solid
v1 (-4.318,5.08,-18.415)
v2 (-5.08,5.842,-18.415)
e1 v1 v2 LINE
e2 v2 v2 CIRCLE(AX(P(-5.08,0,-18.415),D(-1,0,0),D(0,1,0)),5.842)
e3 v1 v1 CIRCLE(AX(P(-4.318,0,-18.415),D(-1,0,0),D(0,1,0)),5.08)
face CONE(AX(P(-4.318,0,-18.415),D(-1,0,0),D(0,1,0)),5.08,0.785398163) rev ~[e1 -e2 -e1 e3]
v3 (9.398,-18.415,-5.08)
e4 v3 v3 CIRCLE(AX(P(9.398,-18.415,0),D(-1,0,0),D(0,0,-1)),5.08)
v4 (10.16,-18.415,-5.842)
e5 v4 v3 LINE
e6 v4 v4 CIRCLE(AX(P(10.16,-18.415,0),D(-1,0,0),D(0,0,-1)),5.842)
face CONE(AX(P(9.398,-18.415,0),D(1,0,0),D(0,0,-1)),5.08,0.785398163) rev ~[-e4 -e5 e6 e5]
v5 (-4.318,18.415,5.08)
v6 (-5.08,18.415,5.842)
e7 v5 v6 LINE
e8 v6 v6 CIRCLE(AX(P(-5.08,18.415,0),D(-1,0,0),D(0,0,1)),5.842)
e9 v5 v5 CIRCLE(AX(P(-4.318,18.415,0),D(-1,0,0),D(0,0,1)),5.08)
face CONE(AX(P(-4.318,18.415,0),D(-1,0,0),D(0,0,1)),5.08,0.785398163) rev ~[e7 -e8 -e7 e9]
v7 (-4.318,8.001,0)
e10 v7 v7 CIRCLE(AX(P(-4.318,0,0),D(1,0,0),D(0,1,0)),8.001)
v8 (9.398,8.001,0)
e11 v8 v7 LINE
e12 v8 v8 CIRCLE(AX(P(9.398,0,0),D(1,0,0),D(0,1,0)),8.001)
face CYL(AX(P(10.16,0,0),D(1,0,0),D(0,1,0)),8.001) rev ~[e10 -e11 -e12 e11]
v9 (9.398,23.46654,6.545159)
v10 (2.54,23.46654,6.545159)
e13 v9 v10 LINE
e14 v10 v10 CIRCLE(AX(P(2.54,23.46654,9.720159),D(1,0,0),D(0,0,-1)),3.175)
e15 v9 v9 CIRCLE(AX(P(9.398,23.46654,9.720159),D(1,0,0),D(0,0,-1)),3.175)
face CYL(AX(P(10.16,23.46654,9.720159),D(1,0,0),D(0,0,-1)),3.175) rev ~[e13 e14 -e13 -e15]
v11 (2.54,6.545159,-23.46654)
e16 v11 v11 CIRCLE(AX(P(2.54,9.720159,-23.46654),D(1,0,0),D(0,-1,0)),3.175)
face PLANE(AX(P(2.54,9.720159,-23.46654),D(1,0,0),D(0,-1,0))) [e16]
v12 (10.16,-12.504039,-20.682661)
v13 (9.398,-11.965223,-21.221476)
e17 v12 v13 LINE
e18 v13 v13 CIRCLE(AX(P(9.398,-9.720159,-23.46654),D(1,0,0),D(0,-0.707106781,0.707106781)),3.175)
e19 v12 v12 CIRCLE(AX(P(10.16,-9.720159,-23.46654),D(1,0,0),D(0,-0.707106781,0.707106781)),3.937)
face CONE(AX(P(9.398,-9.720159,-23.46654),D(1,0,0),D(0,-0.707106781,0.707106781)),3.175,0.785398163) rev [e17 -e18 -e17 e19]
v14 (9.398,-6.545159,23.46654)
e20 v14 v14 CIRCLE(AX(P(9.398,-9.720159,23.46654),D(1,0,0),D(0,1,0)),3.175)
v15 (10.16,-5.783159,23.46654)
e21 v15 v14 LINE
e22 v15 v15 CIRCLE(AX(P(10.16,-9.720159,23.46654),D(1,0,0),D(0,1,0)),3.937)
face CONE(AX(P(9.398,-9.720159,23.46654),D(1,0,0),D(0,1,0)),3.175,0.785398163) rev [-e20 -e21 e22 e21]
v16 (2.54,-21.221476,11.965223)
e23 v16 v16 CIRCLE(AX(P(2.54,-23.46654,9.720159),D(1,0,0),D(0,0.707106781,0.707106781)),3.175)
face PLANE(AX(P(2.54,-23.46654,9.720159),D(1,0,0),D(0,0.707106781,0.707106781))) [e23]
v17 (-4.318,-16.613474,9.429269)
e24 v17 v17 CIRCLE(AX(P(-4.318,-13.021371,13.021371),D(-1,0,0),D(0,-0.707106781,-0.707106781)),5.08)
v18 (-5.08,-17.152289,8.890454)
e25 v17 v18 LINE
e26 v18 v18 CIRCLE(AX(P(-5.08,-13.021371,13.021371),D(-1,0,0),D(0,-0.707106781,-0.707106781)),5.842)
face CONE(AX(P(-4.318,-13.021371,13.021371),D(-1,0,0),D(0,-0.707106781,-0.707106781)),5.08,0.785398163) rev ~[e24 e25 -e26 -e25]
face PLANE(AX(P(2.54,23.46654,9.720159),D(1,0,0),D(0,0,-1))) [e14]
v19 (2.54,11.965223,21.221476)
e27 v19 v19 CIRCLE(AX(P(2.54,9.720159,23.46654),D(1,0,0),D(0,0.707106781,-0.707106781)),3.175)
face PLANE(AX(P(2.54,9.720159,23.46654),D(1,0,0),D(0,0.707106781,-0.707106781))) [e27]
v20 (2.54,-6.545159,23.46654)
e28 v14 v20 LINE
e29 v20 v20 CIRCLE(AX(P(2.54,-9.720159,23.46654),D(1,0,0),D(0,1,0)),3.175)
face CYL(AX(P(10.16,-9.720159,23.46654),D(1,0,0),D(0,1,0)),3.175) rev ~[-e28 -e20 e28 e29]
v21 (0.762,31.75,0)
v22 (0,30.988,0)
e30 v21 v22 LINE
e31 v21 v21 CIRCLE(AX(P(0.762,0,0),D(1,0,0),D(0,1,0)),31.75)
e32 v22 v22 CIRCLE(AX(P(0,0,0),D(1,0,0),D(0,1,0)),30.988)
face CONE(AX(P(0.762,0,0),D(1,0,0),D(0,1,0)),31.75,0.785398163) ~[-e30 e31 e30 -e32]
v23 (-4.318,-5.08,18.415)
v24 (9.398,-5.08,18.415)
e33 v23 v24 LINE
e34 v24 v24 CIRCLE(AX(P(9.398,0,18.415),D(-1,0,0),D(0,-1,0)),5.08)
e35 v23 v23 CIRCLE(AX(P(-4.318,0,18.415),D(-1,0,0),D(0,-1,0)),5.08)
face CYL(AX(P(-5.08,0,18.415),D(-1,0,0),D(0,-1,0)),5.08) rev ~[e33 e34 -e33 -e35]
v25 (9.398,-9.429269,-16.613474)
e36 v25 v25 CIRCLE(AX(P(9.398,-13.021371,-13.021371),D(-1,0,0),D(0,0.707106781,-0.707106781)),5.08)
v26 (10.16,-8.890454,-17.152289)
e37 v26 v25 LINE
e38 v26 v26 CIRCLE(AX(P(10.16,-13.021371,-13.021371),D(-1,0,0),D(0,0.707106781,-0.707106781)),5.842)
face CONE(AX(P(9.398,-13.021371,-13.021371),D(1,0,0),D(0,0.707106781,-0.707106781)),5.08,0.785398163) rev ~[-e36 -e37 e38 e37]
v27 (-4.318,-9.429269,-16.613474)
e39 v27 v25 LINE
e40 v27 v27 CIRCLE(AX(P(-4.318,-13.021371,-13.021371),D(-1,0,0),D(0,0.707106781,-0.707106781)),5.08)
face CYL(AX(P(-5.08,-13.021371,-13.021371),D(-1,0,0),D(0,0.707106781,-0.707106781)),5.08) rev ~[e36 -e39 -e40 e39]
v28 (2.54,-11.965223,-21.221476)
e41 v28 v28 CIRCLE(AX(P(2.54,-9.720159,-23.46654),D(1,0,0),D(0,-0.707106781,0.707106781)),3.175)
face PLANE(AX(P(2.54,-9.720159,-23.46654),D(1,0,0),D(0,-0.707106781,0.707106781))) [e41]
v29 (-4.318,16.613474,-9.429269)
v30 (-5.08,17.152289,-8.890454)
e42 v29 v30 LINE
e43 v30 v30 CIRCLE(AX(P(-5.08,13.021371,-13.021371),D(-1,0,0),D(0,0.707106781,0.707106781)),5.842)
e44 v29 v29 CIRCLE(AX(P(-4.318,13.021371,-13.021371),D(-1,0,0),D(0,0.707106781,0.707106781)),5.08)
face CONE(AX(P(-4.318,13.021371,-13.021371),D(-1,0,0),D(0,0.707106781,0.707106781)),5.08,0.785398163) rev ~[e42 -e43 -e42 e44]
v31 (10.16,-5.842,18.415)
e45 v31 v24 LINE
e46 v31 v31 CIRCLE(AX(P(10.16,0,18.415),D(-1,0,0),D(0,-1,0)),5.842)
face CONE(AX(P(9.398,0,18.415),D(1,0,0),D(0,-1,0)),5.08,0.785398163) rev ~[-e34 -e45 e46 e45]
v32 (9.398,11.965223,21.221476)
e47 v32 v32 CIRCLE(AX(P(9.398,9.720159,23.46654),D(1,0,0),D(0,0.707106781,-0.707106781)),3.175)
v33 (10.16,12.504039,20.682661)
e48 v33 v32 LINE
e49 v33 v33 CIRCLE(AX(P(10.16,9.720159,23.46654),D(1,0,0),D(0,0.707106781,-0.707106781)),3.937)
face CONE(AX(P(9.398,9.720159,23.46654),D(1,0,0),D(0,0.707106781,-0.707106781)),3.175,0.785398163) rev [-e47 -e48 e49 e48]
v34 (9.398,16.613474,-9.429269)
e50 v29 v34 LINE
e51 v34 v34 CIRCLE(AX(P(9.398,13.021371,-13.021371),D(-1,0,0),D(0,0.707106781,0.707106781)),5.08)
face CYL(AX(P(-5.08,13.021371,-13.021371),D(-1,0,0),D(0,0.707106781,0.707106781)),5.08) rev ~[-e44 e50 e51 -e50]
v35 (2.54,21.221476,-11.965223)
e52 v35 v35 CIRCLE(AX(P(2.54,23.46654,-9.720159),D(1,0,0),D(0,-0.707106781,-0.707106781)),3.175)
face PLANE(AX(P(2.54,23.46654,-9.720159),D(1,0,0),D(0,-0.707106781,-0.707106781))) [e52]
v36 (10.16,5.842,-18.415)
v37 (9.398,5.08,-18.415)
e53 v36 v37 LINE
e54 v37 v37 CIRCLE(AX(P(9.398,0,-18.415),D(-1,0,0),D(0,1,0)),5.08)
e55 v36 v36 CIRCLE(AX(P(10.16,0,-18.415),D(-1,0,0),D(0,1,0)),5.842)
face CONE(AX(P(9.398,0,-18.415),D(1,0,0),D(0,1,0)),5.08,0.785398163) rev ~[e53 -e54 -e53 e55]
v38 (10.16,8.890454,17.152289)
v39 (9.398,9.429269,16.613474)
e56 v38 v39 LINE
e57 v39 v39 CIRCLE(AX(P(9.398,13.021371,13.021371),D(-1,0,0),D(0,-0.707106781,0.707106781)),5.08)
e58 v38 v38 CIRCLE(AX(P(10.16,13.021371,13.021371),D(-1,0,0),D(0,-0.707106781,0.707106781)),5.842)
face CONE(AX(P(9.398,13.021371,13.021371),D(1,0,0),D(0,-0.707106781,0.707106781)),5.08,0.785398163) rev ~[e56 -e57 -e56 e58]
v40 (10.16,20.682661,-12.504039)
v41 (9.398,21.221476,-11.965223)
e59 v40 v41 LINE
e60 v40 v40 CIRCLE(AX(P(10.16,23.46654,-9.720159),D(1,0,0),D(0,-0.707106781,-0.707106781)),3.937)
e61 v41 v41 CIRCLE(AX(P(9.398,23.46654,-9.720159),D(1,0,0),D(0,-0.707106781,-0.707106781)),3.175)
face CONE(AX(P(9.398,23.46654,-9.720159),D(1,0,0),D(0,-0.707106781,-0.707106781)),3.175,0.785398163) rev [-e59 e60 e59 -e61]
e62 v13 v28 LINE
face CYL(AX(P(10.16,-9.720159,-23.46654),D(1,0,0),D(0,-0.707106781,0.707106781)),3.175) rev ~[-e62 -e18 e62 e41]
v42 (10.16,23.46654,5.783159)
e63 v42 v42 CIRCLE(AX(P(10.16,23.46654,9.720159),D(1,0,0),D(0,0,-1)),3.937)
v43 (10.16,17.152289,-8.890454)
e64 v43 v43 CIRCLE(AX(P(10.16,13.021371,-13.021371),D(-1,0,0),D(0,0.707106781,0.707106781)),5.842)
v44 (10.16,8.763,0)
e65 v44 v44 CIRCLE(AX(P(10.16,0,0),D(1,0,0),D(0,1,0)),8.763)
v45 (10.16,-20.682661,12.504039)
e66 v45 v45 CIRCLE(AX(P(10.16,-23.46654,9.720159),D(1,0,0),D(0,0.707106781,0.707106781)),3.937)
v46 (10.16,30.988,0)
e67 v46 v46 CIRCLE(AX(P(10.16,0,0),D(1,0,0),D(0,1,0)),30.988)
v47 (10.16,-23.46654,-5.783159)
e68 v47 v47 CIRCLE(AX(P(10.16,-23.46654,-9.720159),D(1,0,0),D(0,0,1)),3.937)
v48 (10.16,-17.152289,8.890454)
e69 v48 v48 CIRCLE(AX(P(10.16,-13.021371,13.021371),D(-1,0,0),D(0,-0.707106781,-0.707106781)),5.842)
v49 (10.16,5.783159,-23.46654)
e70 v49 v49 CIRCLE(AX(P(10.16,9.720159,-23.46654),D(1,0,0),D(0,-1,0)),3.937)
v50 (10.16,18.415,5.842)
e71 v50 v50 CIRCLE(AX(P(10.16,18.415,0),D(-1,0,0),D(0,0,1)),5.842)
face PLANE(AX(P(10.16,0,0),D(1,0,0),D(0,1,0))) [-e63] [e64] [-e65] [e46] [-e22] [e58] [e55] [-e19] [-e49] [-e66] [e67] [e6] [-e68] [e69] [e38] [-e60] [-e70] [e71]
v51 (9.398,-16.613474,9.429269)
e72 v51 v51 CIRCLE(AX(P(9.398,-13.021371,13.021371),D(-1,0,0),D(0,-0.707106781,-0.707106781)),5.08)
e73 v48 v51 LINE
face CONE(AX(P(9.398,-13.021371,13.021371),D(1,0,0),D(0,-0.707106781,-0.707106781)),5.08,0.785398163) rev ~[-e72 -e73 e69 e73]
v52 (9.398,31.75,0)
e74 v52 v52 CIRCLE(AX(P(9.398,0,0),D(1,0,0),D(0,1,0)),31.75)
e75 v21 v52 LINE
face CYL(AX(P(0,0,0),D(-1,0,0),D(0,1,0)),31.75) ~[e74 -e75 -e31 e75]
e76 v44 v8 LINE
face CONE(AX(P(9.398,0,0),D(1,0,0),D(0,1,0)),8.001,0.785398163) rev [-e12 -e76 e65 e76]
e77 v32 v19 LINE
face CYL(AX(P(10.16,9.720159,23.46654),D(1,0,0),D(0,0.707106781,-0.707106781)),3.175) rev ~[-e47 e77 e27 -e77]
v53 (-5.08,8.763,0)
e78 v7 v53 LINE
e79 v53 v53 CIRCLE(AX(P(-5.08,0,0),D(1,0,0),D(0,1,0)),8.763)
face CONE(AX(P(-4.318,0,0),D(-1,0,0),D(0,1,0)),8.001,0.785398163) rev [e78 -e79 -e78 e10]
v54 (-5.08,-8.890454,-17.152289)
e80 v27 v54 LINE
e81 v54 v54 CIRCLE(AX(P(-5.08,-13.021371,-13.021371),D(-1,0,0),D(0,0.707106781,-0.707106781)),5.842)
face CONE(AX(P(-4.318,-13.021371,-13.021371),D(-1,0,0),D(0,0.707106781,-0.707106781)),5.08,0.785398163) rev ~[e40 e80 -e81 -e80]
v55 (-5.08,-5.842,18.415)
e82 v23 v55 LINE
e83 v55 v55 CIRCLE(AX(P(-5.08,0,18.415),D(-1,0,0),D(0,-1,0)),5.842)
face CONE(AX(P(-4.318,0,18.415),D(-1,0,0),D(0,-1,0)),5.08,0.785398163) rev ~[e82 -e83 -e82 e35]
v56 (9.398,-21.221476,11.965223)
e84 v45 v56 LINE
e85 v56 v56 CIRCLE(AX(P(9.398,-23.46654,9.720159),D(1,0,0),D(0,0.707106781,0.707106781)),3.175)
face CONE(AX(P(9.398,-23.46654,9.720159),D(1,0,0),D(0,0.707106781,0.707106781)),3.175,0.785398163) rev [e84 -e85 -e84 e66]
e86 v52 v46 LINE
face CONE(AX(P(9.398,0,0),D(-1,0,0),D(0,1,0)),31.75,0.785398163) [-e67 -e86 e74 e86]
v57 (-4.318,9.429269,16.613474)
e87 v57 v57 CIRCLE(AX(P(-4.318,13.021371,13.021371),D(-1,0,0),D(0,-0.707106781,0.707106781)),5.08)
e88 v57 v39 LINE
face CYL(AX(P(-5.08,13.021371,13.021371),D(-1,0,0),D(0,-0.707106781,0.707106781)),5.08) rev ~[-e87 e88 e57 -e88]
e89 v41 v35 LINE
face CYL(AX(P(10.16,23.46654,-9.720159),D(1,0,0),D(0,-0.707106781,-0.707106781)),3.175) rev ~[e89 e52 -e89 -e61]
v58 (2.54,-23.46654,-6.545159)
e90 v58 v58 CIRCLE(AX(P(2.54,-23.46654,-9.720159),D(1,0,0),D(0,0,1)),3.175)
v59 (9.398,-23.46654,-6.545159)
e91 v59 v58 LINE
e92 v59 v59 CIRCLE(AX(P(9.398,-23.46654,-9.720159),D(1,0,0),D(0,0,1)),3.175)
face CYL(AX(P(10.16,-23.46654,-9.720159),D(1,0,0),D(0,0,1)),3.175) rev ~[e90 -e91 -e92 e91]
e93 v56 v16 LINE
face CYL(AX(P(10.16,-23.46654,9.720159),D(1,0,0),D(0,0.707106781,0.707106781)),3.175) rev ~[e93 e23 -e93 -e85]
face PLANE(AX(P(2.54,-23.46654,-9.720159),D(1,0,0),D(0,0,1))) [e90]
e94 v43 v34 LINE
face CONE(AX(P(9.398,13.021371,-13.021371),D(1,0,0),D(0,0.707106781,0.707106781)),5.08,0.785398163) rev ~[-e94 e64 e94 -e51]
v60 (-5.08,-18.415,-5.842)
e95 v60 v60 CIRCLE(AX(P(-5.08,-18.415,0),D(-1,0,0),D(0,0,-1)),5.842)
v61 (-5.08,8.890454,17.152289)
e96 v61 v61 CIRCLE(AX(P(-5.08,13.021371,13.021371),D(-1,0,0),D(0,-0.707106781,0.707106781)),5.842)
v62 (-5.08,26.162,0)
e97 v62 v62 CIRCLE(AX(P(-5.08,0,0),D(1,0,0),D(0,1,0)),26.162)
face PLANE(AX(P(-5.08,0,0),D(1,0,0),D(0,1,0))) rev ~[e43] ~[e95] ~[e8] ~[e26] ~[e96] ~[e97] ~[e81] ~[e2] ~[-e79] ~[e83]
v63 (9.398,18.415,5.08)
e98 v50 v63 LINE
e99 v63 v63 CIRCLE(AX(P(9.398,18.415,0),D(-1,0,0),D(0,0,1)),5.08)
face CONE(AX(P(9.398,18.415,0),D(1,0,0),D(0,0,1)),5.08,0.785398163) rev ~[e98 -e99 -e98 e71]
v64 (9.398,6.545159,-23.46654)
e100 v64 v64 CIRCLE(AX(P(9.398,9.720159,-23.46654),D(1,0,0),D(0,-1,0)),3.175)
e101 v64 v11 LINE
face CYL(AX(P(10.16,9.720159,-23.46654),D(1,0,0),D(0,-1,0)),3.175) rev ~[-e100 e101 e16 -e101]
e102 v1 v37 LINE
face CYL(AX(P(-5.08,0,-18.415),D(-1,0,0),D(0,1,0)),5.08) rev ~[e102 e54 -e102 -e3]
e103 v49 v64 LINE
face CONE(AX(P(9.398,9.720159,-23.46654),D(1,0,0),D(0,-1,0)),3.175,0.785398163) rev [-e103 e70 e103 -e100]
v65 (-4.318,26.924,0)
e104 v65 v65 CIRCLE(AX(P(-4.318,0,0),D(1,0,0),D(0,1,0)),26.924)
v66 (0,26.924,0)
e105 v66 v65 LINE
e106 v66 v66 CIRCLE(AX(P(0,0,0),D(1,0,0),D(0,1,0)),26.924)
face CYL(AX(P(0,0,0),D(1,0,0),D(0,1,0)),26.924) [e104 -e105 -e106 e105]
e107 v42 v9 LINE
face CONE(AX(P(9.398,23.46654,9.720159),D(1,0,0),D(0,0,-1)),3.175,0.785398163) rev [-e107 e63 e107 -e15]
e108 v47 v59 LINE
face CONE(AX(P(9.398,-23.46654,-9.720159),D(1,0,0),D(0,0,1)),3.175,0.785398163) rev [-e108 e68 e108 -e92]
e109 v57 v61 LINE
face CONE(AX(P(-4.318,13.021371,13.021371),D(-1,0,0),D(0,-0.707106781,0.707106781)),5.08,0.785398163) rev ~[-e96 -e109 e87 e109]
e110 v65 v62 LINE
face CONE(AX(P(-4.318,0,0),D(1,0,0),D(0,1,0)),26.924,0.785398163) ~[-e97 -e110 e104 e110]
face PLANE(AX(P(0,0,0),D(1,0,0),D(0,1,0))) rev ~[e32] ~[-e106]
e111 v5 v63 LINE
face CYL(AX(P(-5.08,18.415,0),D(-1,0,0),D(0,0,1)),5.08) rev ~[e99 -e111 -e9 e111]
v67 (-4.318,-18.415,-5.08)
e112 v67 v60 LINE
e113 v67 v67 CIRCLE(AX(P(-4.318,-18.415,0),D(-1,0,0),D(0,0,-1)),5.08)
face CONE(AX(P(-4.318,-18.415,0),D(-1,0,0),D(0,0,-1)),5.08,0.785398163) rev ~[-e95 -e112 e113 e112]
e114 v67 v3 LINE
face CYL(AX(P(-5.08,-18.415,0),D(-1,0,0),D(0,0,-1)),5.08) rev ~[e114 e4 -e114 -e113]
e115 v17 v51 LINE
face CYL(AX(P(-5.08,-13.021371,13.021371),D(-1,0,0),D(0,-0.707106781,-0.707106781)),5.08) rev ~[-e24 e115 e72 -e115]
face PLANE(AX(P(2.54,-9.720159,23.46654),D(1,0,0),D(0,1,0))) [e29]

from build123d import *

# Parameters (mm, degrees)
F0_R             = 26.924
F1_DEPTH         = 5.08
F2_R             = 31.75
F3_DEPTH         = 10.16
F4_R             = 8.001
F5_DEPTH         = 15.241
F6_SIZE          = 0.762
F7_R             = 5.08
F8_DEPTH         = 15.241
F8_COPIES_COUNT  = 8
F9_R             = 3.175
F10_DEPTH        = 7.62
F10_COPIES_COUNT = 8
F11_SIZE         = 0.762


# Not quite as in the source:
# - a pattern or mirror of a feature is missing from the dataset's text; its kind, count and spacing are read off the source's solid


with BuildPart() as f1:
    # F0 (on Right) → F1 (new body)
    with BuildSketch(Plane.YZ):
        Circle(F0_R)
    extrude(amount=-F1_DEPTH)

    # F2 (on face) → F3 (join)
    with BuildSketch(Plane.YZ):
        Circle(F2_R)
    extrude(amount=F3_DEPTH)

    # F4 (on face) → F5 (cut, through all)
    with BuildSketch(Plane.YZ.offset(10.16)):
        Circle(F4_R)
    extrude(amount=-F5_DEPTH, mode=Mode.SUBTRACT)

    # F6
    f6_edges = [f1.edges().sort_by_distance(p)[0] for p in [
        (10.16, -8.001, 0),
        (10.16, -31.75, 0),
        (0, -31.75, 0),
        (-5.08, -26.924, 0),
        (-5.08, -8.001, 0),
    ]]
    chamfer(f6_edges, length=F6_SIZE)

    # F7 (on face) → F8 (cut, through all)
    with BuildSketch(Plane(origin=(-5.08, 0, 0), x_dir=(0, -1, 0), z_dir=(-1, 0, 0))):
        with Locations((0, 18.415)):
            Circle(F7_R)
    f8 = extrude(amount=-F8_DEPTH, mode=Mode.SUBTRACT)

    # F8_copies: F8 ×8 about axis
    f8_copies_axis = Axis((0, 0, 0), (1, 0, 0))
    for i in range(1, F8_COPIES_COUNT):
        add(f8.rotate(f8_copies_axis, i * 360 / F8_COPIES_COUNT), mode=Mode.SUBTRACT)

    # F9 (on face) → F10 (cut)
    with BuildSketch(Plane.YZ.offset(10.16)):
        with Locations((-9.7201591821, 23.4665401258)):
            Circle(F9_R)
    f10 = extrude(amount=-F10_DEPTH, mode=Mode.SUBTRACT)

    # F10_copies: F10 ×8 about axis
    f10_copies_axis = Axis((0, 0, 0), (1, 0, 0))
    for i in range(1, F10_COPIES_COUNT):
        add(f10.rotate(f10_copies_axis, i * 360 / F10_COPIES_COUNT), mode=Mode.SUBTRACT)

    # F11
    f11_edges = [f1.edges().sort_by_distance(p)[0] for p in [
        (10.16, -12.895159, 23.46654),
        (10.16, 5.08, 18.415),
        (-5.08, 5.08, 18.415),
        (10.16, -7.475095, -25.711604),
        (10.16, -23.46654, -12.895159),
        (10.16, -16.613474, -9.429269),
        (10.16, 12.895159, -23.46654),
        (10.16, -5.08, -18.415),
        (10.16, 9.429269, -16.613474),
        (10.16, 25.711604, -7.475095),
        (10.16, 18.415, -5.08),
        (10.16, -18.415, 5.08),
        (10.16, -25.711604, 7.475095),
        (10.16, -9.429269, 16.613474),
        (10.16, 16.613474, 9.429269),
        (10.16, 23.46654, 12.895159),
        (10.16, 7.475095, 25.711604),
        (-5.08, -16.613474, -9.429269),
        (-5.08, -5.08, -18.415),
        (-5.08, 9.429269, -16.613474),
        (-5.08, 18.415, -5.08),
        (-5.08, -18.415, 5.08),
        (-5.08, -9.429269, 16.613474),
        (-5.08, 16.613474, 9.429269),
    ]]
    chamfer(f11_edges, length=F11_SIZE)


solid = f1.part
